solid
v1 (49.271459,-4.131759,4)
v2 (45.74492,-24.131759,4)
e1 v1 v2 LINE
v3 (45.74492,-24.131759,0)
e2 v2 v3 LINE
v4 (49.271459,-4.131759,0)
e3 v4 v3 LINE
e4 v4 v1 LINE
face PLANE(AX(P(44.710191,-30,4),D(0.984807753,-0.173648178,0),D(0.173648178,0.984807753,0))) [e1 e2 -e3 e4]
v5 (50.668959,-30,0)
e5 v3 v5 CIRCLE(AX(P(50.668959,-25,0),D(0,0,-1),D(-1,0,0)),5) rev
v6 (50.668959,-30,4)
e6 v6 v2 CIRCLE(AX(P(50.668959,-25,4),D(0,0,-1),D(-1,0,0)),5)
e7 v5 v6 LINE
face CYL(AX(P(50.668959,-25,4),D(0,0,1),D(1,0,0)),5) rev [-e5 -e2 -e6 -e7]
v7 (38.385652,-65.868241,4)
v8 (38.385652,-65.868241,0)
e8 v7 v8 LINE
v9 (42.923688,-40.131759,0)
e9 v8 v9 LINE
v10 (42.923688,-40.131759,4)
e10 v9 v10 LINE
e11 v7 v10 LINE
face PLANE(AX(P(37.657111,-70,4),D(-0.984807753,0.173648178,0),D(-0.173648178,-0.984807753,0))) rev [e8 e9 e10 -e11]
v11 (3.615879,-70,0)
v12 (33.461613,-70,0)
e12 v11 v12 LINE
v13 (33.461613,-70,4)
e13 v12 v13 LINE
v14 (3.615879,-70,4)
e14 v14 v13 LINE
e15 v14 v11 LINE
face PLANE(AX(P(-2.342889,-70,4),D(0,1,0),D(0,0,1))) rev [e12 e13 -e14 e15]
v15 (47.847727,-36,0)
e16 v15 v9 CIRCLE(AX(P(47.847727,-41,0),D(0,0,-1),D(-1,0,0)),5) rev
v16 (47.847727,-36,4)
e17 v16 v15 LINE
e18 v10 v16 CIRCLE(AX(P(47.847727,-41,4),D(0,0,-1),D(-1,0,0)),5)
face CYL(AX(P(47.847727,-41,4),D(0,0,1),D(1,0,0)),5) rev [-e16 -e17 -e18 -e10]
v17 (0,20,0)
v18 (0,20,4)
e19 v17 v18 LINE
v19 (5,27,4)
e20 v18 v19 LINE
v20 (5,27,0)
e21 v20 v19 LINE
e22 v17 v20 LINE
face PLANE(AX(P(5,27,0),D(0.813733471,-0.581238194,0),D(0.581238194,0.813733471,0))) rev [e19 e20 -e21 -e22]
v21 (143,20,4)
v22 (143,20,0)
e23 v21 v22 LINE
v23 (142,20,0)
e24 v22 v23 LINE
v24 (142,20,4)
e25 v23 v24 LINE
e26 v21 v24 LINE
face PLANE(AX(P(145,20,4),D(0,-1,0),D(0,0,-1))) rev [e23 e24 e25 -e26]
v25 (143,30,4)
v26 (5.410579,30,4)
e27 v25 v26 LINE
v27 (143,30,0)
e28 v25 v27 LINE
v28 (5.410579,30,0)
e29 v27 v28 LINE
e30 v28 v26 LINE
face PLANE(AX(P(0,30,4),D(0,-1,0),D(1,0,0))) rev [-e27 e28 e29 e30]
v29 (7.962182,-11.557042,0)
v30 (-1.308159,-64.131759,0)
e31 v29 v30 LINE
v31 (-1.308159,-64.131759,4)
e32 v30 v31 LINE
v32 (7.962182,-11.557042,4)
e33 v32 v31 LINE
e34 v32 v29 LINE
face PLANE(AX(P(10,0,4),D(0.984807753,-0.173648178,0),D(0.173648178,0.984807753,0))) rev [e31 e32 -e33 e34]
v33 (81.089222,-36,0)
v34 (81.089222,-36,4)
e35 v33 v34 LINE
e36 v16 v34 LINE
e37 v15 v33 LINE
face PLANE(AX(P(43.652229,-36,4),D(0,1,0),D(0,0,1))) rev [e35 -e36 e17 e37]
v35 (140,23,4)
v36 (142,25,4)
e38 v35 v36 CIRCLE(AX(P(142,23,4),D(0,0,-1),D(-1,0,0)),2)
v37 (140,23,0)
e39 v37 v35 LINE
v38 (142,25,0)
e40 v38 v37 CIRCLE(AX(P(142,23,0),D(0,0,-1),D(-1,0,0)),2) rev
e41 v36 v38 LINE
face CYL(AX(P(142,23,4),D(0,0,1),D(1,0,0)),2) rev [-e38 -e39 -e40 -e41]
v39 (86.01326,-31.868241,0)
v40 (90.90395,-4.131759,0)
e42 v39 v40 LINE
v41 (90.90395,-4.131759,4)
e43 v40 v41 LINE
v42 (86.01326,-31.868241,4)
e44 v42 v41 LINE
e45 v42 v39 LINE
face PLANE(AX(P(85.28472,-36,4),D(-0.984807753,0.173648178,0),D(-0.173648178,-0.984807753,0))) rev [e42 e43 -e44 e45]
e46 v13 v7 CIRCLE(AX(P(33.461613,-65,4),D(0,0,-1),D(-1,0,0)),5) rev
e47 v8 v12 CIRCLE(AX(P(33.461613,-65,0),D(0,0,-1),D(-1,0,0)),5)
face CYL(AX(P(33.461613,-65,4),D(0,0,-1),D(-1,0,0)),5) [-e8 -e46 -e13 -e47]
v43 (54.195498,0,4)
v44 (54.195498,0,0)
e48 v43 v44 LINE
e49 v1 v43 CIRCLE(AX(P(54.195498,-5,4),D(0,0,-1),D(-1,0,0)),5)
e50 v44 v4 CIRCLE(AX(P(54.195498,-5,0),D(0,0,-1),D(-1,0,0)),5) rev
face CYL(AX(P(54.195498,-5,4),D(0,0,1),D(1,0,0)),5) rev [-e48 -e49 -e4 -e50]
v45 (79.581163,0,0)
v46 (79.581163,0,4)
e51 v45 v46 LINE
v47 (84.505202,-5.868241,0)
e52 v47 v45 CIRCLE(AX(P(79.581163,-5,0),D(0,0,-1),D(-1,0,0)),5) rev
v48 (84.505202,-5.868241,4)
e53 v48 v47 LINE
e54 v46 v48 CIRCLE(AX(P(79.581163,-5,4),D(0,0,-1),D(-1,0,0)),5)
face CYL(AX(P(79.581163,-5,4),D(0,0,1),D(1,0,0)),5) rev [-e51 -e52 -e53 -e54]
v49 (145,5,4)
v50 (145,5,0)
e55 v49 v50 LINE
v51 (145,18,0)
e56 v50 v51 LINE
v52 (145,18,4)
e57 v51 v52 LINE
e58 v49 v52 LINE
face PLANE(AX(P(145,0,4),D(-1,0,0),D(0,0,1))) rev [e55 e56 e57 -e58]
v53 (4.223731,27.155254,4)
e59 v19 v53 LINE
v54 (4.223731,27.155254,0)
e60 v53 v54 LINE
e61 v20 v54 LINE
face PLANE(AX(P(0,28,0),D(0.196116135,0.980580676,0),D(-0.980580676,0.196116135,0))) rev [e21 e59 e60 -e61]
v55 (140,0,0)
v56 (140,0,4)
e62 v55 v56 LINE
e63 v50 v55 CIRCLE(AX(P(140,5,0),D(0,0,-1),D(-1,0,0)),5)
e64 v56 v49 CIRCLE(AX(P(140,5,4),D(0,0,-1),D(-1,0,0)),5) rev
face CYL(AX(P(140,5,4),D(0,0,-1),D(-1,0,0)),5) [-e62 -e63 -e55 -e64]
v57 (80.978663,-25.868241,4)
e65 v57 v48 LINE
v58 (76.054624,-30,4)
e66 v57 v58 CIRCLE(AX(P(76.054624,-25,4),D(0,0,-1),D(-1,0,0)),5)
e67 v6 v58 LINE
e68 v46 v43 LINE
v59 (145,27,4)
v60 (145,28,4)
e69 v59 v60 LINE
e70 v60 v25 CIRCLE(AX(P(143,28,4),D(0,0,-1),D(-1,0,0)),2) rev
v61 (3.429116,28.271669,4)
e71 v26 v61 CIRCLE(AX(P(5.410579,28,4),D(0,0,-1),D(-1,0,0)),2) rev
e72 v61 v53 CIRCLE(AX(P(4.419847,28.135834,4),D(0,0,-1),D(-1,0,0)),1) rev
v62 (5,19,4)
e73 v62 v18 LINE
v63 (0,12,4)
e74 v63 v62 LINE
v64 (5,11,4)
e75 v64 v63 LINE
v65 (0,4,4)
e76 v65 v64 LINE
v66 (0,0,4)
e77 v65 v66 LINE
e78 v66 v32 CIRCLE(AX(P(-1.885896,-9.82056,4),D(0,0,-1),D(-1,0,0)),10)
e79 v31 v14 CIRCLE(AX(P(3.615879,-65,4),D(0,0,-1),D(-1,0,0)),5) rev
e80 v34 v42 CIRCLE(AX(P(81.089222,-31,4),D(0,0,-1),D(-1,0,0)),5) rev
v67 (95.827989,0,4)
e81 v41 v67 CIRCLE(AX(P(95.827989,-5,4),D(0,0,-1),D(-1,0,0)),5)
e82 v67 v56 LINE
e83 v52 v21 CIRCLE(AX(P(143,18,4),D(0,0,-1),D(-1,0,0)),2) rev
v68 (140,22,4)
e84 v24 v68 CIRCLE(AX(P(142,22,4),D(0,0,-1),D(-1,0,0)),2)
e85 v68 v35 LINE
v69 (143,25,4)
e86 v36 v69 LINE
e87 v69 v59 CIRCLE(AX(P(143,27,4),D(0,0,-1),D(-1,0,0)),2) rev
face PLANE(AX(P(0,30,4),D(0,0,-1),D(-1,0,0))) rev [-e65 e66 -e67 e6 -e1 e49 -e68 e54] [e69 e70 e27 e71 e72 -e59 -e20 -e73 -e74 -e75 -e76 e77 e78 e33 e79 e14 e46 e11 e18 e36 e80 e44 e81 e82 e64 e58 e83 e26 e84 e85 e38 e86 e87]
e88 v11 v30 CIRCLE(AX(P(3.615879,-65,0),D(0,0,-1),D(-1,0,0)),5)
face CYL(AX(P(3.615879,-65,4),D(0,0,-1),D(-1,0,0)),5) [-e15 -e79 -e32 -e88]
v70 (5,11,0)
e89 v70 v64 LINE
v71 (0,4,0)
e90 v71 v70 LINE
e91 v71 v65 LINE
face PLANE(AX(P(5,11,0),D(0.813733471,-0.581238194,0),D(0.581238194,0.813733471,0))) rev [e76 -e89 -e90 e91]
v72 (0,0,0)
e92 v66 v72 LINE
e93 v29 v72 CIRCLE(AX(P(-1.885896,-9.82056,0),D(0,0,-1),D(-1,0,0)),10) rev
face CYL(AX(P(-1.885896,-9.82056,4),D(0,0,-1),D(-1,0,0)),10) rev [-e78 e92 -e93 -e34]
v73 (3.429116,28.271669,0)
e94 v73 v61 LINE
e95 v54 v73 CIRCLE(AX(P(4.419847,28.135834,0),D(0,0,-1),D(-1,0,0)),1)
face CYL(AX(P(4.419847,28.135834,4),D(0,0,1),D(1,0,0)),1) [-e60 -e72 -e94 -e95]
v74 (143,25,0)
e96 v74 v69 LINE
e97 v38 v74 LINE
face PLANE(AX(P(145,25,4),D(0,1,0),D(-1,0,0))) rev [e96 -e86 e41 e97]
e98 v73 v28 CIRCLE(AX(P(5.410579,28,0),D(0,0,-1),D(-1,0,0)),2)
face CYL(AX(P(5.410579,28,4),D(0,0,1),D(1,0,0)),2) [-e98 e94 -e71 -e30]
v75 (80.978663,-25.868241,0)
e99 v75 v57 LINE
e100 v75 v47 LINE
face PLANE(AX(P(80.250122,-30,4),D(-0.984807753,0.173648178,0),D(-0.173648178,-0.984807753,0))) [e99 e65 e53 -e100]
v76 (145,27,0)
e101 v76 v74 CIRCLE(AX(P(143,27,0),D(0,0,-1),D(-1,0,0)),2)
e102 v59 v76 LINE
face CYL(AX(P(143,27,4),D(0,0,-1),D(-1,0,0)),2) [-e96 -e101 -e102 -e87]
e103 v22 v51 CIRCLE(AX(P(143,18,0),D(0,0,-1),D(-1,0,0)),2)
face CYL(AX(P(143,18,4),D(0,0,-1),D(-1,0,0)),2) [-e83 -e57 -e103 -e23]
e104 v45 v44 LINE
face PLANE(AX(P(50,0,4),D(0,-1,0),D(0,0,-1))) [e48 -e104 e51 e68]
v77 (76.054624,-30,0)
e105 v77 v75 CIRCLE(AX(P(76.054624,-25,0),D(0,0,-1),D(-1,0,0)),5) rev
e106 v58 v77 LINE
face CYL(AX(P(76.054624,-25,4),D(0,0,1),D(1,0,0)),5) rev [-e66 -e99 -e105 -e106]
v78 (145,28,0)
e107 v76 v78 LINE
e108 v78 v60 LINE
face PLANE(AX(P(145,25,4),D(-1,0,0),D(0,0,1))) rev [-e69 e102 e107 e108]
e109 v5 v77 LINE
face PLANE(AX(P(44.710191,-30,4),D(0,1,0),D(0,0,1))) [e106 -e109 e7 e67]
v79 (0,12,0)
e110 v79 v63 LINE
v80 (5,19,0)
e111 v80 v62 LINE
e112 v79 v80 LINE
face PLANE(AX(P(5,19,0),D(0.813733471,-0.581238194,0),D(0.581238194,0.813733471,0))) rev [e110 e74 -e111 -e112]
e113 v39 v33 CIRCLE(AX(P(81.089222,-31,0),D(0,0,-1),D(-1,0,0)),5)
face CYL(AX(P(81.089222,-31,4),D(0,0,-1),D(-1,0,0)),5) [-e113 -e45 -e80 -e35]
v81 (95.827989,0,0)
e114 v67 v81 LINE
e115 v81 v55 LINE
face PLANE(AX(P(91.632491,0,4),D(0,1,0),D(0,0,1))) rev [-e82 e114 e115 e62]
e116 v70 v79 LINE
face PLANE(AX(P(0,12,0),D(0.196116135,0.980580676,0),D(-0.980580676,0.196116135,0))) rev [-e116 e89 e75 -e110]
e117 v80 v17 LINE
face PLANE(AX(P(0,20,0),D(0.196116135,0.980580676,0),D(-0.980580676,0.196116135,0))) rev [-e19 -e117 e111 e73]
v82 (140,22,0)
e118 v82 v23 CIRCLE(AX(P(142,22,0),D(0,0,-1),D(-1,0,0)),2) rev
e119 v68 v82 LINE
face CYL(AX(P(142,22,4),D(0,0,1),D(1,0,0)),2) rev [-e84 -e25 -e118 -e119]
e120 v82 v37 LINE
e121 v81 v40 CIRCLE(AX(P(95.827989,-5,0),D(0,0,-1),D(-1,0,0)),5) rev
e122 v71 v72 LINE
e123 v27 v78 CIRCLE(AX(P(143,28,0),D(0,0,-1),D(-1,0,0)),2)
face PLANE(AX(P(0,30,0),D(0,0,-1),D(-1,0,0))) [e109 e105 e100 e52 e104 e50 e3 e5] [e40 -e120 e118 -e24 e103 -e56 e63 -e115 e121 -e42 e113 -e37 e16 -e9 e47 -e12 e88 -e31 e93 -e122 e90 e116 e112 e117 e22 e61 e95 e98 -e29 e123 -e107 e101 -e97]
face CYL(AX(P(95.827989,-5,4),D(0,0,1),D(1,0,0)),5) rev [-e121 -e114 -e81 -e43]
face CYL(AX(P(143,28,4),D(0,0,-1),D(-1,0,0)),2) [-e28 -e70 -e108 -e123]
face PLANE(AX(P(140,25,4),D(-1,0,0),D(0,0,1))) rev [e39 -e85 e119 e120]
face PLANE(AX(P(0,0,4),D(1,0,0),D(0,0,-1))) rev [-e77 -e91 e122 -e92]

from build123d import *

# Parameters (mm, degrees)
BOSS_EXTRUDE1_DEPTH = 4
FILLET1_R           = 10
FILLET2_R           = 5
CUT_EXTRUDE1_DEPTH  = 4
LPATTERN1_COUNT     = 3
LPATTERN1_PITCH     = 8
FILLET3_R           = 2
FILLET4_R           = 2
CUT_EXTRUDE2_DEPTH  = 10
FILLET5_R           = 2
FILLET6_R           = 1


with BuildPart() as part:
    # Sketch1 → Boss-Extrude1 (new body)
    with BuildSketch(Plane.XY):
        Polygon((10, 0), (-2.34288865, -70), (37.65711135, -70), (43.652228694, -36), (85.284719782, -36), (91.632491087, 0), (145, 0), (145, 20), (140, 20), (140, 25), (145, 25), (145, 30), (0, 30), (0, 0), align=None)
        Polygon((44.710190579, -30), (80.250121995, -30), (85.539931416, 0), (50, 0), align=None, mode=Mode.SUBTRACT)
    extrude(amount=BOSS_EXTRUDE1_DEPTH)

    # Fillet1
    # the kernel refuses this fillet: 10 mm, written as the material it adds along each edge
    with BuildSketch(Plane(origin=(10, 0, 0), x_dir=(-0.17364817766693433, -0.9848077530122074, 0), z_dir=(0, 0, 1))) as fillet1_piece_1:
        with BuildLine():
            CenterArc((11.735327688, -10), FILLET1_R, 90, 89.129514879)
            Line((1.736481777, -9.84807753), (1.536504858, -9.845039081))
            ThreePointArc((1.536504858, -9.845039081), (0.671279338, -4.958768401), (-0.196961551, -0.034729636))
            Line((-0.196961551, -0.034729636), (0, 0.2))
            Line((0, 0.2), (11.735327688, 0.2))
            Line((11.735327688, 0.2), (11.735327688, 0))
        make_face()
    extrude(amount=4)

    # Fillet2
    fillet2_edges = [part.edges().sort_by_distance(p)[0] for p in [
        (145, 0, 2),
        (91.632491087, 0, 2),
        (85.284719782, -36, 2),
        (43.652228694, -36, 2),
        (37.65711135, -70, 2),
        (-2.34288865, -70, 2),
        (85.539931416, 0, 2),
        (50, 0, 2),
        (44.710190579, -30, 2),
        (80.250121995, -30, 2),
    ]]
    fillet(fillet2_edges, radius=FILLET2_R)

    # Sketch2 → Cut-Extrude1 (cut)
    with BuildSketch(Plane.XY.offset(4)):
        Polygon((0, 20), (0, 28), (5, 27), align=None)
    cut_extrude1 = extrude(amount=-CUT_EXTRUDE1_DEPTH, mode=Mode.SUBTRACT)

    # LPattern1: Cut-Extrude1 ×3
    with Locations(*[(0, -i * LPATTERN1_PITCH, 0) for i in range(1, LPATTERN1_COUNT)]):
        add(cut_extrude1, mode=Mode.SUBTRACT)

    # Fillet3
    fillet3_edges = [part.edges().sort_by_distance(p)[0] for p in [
        (145, 25, 2),
        (140, 25, 2),
        (140, 20, 2),
        (145, 20, 2),
    ]]
    fillet(fillet3_edges, radius=FILLET3_R)

    # Fillet4
    fillet4_edges = [part.edges().sort_by_distance(p)[0] for p in [
        (145, 30, 2),
    ]]
    fillet(fillet4_edges, radius=FILLET4_R)

    # Sketch3 → Cut-Extrude2 (cut)
    with BuildSketch(Plane.XY.offset(4)):
        Polygon((3.410578707, 27.317884259), (3.410578707, 32.702988903), (-2.245047392, 32.702988903), (-2.245047392, 26.199863932), align=None)
    extrude(amount=-CUT_EXTRUDE2_DEPTH, mode=Mode.SUBTRACT)

    # Fillet5
    fillet5_edges = [part.edges().sort_by_distance(p)[0] for p in [
        (3.410578707, 30, 2),
    ]]
    fillet(fillet5_edges, radius=FILLET5_R)

    # Fillet6
    fillet6_edges = [part.edges().sort_by_distance(p)[0] for p in [
        (3.410578707, 27.317884259, 2),
    ]]
    fillet(fillet6_edges, radius=FILLET6_R)


solid = part.part
